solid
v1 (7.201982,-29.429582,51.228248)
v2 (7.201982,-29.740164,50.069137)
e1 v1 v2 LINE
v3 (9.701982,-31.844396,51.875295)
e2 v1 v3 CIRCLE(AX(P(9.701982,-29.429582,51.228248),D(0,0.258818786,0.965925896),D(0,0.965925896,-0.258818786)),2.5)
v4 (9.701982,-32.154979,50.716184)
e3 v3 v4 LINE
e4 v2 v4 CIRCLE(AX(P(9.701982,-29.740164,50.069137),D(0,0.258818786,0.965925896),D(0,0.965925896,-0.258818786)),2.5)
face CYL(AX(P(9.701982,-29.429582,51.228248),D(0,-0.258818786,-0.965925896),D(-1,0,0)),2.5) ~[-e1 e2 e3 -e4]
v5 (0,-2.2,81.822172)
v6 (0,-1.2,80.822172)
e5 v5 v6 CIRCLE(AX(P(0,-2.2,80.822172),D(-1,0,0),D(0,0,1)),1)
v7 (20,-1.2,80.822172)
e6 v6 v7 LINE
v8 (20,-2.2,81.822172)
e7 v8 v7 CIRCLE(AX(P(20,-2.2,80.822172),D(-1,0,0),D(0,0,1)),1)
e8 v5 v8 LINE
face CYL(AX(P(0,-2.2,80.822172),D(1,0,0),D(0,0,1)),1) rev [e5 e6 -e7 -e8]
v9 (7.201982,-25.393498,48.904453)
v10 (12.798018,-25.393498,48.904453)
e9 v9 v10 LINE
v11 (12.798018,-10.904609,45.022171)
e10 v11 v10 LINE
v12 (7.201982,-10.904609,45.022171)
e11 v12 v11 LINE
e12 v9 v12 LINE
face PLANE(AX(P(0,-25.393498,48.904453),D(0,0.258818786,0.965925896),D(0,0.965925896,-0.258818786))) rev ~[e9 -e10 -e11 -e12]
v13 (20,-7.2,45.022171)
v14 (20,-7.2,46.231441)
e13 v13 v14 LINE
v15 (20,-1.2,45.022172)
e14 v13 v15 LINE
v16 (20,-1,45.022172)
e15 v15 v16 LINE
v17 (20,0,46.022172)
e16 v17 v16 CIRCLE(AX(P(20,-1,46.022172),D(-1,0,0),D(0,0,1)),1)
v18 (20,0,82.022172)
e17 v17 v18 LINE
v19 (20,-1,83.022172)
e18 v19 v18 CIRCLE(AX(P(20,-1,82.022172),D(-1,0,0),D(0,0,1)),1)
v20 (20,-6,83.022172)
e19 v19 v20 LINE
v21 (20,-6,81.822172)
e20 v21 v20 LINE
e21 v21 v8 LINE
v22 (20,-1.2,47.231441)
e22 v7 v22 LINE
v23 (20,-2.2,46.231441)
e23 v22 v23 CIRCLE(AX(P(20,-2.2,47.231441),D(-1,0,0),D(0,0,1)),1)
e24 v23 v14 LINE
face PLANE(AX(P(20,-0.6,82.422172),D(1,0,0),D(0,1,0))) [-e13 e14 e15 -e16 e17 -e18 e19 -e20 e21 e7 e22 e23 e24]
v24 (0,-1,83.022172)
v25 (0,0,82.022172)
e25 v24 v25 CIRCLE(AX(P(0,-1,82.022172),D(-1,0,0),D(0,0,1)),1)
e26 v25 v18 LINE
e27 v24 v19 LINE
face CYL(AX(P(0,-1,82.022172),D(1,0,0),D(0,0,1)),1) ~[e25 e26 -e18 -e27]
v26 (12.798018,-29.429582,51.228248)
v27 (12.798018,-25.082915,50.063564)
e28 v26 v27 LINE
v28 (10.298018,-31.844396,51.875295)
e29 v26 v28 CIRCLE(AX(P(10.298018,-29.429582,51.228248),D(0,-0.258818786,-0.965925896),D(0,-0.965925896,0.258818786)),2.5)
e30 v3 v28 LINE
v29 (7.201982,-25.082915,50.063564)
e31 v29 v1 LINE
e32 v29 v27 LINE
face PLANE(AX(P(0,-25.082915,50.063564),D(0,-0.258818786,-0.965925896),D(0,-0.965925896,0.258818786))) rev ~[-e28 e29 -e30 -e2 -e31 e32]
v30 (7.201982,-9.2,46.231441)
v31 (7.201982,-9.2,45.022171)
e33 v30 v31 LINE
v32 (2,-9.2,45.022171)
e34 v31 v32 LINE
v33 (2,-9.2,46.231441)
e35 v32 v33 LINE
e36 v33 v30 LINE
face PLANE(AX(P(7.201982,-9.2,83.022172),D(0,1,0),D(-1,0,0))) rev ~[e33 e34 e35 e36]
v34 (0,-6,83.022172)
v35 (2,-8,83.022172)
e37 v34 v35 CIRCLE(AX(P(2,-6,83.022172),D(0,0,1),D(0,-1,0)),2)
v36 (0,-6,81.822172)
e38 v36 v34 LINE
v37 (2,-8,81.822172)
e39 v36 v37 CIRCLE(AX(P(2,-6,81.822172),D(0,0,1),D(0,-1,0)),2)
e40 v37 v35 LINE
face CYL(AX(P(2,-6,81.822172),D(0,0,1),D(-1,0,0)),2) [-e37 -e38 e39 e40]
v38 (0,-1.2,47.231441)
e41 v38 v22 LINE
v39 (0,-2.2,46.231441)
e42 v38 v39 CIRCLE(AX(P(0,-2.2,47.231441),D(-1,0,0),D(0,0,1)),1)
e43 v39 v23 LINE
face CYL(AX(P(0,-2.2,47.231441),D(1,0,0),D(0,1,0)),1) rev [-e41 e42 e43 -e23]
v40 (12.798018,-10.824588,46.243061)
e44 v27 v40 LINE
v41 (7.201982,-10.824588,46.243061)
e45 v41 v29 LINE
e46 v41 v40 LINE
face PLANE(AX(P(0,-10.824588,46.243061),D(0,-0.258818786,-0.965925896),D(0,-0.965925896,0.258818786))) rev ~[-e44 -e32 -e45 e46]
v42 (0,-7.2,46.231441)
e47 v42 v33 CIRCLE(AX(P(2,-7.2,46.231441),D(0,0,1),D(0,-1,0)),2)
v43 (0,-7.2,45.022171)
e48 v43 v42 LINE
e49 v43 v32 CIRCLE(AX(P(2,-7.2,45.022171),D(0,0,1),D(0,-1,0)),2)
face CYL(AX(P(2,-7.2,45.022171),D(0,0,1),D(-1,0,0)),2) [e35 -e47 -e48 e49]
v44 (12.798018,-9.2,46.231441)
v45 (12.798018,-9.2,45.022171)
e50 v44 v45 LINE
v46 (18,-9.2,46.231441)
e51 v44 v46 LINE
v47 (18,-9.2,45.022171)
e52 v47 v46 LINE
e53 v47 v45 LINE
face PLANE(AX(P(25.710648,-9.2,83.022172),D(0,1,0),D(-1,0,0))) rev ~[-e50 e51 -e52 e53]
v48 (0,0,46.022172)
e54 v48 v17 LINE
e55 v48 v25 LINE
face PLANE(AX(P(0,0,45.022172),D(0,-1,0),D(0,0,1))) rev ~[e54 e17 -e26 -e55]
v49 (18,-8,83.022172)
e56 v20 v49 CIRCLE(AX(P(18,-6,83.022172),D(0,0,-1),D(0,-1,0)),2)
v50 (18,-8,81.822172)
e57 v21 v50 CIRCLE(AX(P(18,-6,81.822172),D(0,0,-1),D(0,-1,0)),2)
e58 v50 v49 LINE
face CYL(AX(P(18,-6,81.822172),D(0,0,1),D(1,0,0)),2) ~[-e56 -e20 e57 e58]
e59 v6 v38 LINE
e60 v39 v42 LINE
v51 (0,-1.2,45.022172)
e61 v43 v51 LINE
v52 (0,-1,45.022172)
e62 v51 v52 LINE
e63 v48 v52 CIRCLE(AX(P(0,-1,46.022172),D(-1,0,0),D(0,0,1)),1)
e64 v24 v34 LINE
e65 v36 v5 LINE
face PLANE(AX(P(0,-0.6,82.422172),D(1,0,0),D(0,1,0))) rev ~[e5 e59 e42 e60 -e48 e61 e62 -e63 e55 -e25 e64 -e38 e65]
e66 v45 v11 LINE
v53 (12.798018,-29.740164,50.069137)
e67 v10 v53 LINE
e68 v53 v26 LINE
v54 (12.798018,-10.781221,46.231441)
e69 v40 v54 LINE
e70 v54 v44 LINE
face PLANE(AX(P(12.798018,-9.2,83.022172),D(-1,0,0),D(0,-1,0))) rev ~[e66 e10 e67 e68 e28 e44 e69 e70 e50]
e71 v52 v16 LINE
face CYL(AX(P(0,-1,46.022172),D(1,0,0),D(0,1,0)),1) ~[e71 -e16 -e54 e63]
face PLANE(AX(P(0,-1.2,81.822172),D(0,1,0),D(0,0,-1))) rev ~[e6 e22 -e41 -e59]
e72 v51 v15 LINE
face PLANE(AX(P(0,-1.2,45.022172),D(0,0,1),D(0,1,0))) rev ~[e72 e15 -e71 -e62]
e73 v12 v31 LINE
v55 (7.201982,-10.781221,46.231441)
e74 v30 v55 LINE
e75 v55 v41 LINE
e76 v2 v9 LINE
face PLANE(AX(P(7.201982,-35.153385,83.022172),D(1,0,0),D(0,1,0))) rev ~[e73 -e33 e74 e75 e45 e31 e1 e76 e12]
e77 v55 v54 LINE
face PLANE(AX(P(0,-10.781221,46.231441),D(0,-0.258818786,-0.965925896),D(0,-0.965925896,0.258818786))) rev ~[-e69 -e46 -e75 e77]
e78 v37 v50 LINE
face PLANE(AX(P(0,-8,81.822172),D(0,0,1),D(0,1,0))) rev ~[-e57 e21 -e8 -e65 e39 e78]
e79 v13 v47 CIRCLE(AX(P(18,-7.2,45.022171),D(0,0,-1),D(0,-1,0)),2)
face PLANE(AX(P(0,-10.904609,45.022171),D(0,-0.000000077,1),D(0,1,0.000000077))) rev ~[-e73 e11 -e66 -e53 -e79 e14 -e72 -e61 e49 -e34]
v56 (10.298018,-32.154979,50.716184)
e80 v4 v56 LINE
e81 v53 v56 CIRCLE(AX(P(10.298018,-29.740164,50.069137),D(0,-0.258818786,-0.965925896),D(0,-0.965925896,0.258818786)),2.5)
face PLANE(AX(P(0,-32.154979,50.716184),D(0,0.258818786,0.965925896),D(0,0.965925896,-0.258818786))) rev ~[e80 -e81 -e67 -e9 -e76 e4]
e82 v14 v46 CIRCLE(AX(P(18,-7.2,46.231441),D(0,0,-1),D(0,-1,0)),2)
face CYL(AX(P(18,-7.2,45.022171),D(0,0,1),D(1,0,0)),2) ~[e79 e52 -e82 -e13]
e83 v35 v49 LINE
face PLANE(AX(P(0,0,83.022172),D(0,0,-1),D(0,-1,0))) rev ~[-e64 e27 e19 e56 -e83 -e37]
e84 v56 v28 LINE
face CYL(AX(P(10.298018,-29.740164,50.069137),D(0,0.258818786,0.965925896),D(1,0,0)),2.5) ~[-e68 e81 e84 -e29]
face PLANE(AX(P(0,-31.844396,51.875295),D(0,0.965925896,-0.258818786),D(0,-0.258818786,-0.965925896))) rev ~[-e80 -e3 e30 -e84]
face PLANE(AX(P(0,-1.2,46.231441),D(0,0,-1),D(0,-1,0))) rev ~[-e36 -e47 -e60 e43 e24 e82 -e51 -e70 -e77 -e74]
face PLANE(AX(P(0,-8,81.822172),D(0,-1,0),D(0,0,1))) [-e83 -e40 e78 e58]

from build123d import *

# Parameters (mm, degrees)
F0_W     = 1.2
F0_H     = 1.2
F0_W_2   = 6.8
F0_H_2   = 35.5907311706
F0_H_3   = 1.2092688294
F1_DEPTH = 20
F3_DEPTH = 40.4
F4_R     = 2
F5_R     = 2.5
F6_R     = 2
F7_R     = 1


# Not quite as in the source:
# - ends of sketch curves that miss each other by under 0.0002 mm in the source are joined


with BuildPart() as f1:
    # F0 (on Right) → F1 (new body)
    with BuildSketch(Plane.YZ):
        with Locations((-0.6, 82.4221718073)):
            Rectangle(F0_W, F0_H)
        with Locations((-4.6, 82.4221718073)):
            Rectangle(F0_W_2, F0_H)
        with Locations((-0.6, 64.026806222)):
            Rectangle(F0_W, F0_H_2)
        with Locations((-0.6, 45.626806222)):
            Rectangle(F0_W, F0_H_3)
        Polygon((-1.2, 45.0221718073), (-1.2, 46.2314406367), (-10.7555877391, 46.2314406367), (-10.7812210649, 46.2314406367), (-10.8245881359, 46.2430607959), (-25.0829152046, 50.0635639224), (-31.8443964743, 51.8752954254), (-32.1549790177, 50.7161843506), (-25.393497748, 48.9044528476), (-10.9046093128, 45.0221710554), align=None)
    extrude(amount=F1_DEPTH)

    # F2 (on face) → F3 (cut)
    with BuildSketch(Plane.XY.offset(83.0221718073)):
        Polygon((7.2019821778, -9.2), (-6.1580585316, -9.2), (-6.1580585316, -39.2), (25.7106479257, -39.2), (25.7106479257, -9.2), (12.7980178222, -9.2), (12.7980178222, -35.1533853561), (7.2019821778, -35.1533853561), align=None)
    extrude(amount=-F3_DEPTH, mode=Mode.SUBTRACT)

    # F4
    f4_edges = [f1.edges().sort_by_distance(p)[0] for p in [
        (0, -9.2, 45.626806),
        (20, -9.2, 45.626806),
    ]]
    fillet(f4_edges, radius=F4_R)

    # F5
    f5_edges = [f1.edges().sort_by_distance(p)[0] for p in [
        (12.798018, -31.999688, 51.29574),
        (7.201982, -31.999688, 51.29574),
    ]]
    fillet(f5_edges, radius=F5_R)

    # F6
    f6_edges = [f1.edges().sort_by_distance(p)[0] for p in [
        (20, -8, 82.422172),
        (0, -8, 82.422172),
    ]]
    fillet(f6_edges, radius=F6_R)

    # F7
    f7_edges = [f1.edges().sort_by_distance(p)[0] for p in [
        (10, -1.2, 46.231441),
        (10, 0, 45.022172),
        (10, 0, 83.022172),
        (10, -1.2, 81.822172),
    ]]
    fillet(f7_edges, radius=F7_R)


solid = f1.part
